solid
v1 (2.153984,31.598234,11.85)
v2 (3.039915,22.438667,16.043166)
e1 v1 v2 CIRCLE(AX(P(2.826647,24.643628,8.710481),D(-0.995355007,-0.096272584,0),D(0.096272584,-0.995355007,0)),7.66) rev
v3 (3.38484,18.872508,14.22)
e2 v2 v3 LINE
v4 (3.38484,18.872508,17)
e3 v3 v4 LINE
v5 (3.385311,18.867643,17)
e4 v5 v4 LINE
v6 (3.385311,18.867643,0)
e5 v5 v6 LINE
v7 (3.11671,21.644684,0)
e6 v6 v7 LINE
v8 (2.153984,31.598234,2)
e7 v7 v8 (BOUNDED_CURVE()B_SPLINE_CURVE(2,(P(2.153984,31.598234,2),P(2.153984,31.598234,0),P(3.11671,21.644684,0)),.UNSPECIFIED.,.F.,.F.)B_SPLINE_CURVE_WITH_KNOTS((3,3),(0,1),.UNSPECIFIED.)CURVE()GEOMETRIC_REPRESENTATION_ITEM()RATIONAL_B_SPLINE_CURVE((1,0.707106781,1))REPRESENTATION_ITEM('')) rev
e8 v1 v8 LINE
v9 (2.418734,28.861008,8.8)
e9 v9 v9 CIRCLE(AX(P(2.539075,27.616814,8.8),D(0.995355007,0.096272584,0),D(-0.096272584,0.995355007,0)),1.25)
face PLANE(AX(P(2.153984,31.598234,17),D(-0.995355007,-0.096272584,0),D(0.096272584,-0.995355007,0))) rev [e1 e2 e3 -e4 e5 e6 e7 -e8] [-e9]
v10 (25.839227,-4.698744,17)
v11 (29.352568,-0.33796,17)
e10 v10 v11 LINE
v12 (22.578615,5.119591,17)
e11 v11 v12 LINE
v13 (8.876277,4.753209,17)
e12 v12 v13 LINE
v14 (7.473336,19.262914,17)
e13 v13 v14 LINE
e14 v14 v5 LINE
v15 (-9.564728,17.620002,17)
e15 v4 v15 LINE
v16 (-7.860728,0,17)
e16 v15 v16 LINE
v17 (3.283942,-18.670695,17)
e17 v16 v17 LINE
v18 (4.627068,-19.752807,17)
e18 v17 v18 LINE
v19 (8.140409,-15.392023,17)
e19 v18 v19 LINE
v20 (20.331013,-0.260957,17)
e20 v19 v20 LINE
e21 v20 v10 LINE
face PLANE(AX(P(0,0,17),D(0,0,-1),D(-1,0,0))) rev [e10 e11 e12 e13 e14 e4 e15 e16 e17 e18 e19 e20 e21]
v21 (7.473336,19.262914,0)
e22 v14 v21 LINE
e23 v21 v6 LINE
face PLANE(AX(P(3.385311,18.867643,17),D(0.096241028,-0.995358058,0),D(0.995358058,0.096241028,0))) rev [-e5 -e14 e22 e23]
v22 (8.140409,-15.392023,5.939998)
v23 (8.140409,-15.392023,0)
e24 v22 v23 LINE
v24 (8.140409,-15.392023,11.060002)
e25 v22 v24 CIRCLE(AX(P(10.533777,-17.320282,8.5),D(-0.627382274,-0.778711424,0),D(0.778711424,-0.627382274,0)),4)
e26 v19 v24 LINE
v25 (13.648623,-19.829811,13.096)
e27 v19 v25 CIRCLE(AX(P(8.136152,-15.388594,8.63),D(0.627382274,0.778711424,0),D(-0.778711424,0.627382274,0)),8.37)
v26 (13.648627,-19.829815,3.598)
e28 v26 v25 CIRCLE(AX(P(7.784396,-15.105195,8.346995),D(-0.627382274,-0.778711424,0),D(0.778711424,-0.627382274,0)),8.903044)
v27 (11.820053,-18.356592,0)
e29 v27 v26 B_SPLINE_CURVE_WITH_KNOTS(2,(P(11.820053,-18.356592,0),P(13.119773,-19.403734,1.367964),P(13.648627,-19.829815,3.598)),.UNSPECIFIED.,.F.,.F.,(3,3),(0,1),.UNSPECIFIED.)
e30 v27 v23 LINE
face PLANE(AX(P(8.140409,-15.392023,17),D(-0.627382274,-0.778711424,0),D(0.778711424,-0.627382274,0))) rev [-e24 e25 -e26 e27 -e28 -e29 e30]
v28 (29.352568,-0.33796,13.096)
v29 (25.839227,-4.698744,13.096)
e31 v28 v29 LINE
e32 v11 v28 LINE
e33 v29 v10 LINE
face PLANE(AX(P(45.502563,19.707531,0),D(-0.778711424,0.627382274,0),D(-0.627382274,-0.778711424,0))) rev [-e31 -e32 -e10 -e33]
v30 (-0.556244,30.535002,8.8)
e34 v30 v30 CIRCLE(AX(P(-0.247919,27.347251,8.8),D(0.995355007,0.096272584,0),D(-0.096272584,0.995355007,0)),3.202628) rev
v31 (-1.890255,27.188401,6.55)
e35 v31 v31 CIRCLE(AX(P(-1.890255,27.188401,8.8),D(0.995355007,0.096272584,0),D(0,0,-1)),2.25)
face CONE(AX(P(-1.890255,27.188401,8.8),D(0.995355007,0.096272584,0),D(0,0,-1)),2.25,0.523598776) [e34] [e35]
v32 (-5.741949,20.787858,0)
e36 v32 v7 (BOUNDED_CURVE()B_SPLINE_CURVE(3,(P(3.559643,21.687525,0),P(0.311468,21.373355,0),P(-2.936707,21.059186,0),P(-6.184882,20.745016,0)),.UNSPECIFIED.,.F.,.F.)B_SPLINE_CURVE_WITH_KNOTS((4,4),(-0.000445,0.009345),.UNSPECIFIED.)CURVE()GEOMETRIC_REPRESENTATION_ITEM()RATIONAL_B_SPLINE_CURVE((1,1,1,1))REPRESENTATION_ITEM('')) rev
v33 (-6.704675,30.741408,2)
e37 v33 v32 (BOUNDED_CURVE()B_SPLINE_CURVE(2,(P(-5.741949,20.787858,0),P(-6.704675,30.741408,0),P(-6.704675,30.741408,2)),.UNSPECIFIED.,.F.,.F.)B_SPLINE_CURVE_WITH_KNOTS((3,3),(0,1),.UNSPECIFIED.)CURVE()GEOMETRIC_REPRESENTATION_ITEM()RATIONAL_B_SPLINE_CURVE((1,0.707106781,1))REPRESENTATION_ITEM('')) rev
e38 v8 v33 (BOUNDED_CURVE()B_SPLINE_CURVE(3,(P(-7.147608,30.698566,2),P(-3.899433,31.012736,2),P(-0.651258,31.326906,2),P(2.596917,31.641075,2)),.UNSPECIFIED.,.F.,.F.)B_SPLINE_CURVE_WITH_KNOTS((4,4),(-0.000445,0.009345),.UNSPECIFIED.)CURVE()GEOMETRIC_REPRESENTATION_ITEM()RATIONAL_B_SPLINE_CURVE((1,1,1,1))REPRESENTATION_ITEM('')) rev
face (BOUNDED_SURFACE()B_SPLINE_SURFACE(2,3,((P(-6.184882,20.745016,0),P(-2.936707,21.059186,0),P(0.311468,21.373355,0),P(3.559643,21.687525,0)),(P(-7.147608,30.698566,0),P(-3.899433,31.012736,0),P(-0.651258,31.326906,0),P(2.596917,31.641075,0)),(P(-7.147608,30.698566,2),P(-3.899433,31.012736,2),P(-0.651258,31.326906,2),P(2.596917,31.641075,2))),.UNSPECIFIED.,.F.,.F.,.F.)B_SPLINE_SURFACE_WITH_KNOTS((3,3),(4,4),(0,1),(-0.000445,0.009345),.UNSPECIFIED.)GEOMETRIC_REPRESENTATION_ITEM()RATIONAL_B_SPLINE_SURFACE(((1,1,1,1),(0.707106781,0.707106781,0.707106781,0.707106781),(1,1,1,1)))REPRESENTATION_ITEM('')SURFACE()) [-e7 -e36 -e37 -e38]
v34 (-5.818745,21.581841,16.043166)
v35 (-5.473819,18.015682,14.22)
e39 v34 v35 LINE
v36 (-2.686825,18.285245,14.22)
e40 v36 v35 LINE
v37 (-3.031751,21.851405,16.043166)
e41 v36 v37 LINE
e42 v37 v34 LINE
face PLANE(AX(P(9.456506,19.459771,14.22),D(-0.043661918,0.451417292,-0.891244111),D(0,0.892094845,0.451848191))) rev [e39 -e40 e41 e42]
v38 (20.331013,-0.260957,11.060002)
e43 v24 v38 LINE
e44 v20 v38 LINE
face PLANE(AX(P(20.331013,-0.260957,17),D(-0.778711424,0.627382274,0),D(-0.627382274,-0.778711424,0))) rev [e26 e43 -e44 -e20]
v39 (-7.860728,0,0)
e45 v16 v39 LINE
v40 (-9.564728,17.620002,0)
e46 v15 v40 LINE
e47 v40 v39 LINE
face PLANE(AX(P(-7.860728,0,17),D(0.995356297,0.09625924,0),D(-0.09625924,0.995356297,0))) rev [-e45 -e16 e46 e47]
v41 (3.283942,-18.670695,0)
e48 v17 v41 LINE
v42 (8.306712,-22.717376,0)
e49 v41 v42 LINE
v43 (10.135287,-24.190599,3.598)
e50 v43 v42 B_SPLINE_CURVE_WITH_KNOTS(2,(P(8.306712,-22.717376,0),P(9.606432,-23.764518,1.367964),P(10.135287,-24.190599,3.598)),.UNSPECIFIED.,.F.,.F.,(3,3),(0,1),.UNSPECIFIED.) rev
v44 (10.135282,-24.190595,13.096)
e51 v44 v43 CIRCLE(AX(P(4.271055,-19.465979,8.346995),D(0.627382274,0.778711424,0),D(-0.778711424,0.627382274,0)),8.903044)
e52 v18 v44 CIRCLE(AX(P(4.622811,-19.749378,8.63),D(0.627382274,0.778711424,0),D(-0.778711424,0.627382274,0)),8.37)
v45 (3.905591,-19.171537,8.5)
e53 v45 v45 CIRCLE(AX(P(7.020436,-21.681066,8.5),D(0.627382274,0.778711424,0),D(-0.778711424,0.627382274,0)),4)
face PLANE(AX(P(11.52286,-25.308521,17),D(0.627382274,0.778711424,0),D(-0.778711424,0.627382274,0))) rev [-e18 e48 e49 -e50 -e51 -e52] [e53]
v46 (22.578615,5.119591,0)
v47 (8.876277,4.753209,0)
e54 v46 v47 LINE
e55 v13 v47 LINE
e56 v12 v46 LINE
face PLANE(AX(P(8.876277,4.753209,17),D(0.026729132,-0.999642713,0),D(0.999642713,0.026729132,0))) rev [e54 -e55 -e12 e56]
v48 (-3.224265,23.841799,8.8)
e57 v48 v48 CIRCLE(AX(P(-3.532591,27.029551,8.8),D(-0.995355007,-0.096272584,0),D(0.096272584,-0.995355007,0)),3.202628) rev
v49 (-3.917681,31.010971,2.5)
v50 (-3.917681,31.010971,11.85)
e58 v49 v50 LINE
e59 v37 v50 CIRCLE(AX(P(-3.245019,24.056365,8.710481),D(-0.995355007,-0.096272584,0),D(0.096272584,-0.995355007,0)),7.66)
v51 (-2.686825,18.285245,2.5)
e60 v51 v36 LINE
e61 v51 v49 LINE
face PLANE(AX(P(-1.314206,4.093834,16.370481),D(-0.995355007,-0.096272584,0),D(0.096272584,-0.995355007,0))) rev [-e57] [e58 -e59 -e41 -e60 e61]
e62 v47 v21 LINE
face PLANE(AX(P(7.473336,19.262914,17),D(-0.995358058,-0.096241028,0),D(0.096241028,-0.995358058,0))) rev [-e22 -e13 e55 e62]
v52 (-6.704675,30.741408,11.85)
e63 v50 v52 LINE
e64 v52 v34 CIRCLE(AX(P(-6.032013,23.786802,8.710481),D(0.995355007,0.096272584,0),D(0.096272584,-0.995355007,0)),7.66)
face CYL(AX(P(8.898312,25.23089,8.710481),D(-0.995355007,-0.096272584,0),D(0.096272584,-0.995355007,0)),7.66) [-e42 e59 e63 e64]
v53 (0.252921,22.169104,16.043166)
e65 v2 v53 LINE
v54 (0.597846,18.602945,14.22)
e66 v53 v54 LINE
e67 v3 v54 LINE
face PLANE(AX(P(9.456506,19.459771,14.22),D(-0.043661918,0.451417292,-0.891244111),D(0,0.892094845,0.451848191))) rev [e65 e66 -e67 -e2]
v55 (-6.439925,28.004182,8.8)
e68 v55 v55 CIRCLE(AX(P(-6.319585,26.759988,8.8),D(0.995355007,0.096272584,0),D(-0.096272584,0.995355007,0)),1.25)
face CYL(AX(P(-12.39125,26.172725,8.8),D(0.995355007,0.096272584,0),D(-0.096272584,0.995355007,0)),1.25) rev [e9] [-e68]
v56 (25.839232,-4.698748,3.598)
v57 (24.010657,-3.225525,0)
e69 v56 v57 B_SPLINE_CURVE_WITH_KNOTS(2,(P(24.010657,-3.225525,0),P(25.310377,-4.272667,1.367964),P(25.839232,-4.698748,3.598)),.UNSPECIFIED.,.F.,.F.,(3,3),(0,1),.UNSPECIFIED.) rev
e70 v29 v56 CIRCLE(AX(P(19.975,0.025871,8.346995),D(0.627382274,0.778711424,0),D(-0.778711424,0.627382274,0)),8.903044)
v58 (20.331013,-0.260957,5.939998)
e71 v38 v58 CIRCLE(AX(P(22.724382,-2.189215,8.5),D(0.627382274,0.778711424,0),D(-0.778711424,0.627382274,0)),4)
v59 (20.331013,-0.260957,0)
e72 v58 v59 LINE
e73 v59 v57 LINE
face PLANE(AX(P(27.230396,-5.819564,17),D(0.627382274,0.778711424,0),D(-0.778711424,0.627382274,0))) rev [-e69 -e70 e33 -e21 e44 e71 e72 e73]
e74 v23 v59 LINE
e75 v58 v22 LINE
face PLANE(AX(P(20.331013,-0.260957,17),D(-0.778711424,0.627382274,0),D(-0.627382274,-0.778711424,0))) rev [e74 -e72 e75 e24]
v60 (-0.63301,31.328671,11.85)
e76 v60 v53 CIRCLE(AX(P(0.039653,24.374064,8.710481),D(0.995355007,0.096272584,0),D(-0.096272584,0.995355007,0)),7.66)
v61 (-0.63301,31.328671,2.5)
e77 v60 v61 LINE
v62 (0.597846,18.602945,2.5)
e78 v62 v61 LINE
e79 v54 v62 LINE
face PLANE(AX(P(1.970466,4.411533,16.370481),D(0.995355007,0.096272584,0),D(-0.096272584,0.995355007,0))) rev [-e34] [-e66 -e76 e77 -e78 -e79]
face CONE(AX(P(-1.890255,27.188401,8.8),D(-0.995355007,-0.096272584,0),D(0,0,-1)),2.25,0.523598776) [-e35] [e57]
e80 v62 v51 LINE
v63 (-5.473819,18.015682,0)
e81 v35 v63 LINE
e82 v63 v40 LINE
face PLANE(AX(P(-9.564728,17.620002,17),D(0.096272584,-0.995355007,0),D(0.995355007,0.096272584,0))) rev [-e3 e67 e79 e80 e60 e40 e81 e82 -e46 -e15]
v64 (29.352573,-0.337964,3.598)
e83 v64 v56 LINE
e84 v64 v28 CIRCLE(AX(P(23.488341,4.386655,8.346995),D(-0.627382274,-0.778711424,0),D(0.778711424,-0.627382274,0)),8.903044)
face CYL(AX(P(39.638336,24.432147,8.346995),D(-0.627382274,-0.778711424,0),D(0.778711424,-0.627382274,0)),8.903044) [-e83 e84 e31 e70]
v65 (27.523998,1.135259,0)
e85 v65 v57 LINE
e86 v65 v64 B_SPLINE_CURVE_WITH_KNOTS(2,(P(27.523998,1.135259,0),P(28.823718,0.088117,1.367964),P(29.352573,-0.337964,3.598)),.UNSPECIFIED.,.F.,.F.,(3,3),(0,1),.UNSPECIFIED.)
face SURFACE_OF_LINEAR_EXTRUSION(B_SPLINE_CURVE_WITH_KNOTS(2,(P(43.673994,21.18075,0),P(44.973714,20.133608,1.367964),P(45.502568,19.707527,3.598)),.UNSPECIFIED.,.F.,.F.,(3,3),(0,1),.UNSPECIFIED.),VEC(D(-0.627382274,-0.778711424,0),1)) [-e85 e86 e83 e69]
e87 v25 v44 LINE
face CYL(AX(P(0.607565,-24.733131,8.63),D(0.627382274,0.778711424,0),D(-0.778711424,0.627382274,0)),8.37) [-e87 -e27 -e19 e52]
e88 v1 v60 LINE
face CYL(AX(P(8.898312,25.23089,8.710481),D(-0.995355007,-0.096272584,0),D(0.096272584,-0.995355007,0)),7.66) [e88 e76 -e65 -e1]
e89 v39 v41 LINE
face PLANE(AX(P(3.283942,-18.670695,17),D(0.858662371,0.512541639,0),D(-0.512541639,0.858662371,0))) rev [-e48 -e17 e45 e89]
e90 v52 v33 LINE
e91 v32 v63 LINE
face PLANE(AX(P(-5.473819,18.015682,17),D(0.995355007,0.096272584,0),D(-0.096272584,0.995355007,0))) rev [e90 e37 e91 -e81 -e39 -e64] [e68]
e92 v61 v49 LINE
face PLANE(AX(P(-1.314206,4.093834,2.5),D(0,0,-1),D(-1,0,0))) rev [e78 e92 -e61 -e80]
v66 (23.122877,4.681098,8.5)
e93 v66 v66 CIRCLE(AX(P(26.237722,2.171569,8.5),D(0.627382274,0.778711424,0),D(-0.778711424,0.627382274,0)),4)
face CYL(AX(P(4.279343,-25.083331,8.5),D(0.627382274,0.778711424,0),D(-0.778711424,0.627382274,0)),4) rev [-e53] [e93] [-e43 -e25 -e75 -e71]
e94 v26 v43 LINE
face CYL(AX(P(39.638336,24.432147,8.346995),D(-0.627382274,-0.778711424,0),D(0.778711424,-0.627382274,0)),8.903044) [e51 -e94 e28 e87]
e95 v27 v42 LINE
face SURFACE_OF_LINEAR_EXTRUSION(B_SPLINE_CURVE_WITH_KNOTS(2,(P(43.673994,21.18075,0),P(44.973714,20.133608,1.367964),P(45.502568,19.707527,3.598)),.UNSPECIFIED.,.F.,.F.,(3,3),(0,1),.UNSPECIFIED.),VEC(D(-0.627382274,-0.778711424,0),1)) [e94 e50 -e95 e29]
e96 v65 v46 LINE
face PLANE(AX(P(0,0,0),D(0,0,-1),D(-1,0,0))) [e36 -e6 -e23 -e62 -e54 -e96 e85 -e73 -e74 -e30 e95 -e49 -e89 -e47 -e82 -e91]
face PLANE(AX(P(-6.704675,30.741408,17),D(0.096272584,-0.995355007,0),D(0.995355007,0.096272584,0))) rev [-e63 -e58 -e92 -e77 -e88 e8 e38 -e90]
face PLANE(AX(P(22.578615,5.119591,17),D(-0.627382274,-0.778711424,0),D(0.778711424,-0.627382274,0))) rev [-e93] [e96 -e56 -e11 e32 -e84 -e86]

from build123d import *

# Parameters (mm, degrees)
BOSS_EXTRUDE1_DEPTH     = 17
CUT_EXTRUDE1_DEPTH      = 15
CUT_EXTRUDE2_DEPTH      = 46.197309304
CUT_EXTRUDE2_DEPTH_BACK = 46.197309304
CUT_EXTRUDE3_DEPTH      = 12
SKETCH6_R               = 4
CUT_EXTRUDE4_DEPTH      = 35
CUT_EXTRUDE5_START      = -12.78511231
CUT_EXTRUDE5_OUTLINE_W  = 3.3
CUT_EXTRUDE5_OUTLINE_H  = 13.870481222
CUT_EXTRUDE5_DEPTH      = 12.78511231
SKETCH8_R               = 1.25
CUT_EXTRUDE6_DEPTH      = 15
SKETCH10_R              = 1.25
CUT_EXTRUDE7_DEPTH      = 15
FILLET1_SIZE            = 2
FILLET1_SIZE_2          = 10


# Read off the part's stored shape, not the designer's step: Cut-Extrude5, Extrude-Thin1
with BuildPart() as part:
    # Sketch1 → Boss-Extrude1 (new body)
    with BuildSketch(Plane.XY):
        Polygon((-9.564728379, 17.62000192), (-5.473819301, 18.015682238), (-6.704675095, 30.741407789), (2.153984466, 31.598233783), (3.38531081, 18.867643246), (7.473335954, 19.262913811), (8.876277245, 4.753208867), (22.578615379, 5.119591375), (30.743737203, -1.458779689), (27.230396467, -5.819563663), (20.33101325, -0.260956714), (8.140408694, -15.392023407), (15.036201119, -20.947737373), (11.522860383, -25.308521347), (3.283942394, -18.670695131), (-7.860727511, 0), align=None)
    extrude(amount=BOSS_EXTRUDE1_DEPTH)

    # Sketch3 → Cut-Extrude1 (cut)
    with BuildSketch(Plane(origin=(-3.696725775, -0.357554178, 0), x_dir=(0, 0, 1), z_dir=(-0.9953550068413657, -0.09627258361457379, 0))):
        with BuildLine():
            Line((0, 31.244090554), (0, 32.721435634))
            Line((0, 32.721435634), (17.68, 32.721435634))
            Line((17.68, 32.721435634), (17.68, 18.458978244))
            Line((17.68, 18.458978244), (14.22, 18.458978244))
            Line((14.22, 18.458978244), (16.043166109, 22.04177957))
            ThreePointArc((16.043166109, 22.04177957), (15.680947079, 27.433223117), (11.85, 31.244090554))
            Line((11.85, 31.244090554), (0, 31.244090554))
        make_face()
    extrude(amount=-CUT_EXTRUDE1_DEPTH, mode=Mode.SUBTRACT)

    # Sketch4 → Cut-Extrude2 (cut, two sides: drawn at the far end of the back side and taken through both)
    with BuildSketch(Plane(origin=(7.87496966, 9.774469394, 0), x_dir=(0.7787114240648987, -0.6273822742402098, 0), z_dir=(-0.6273822742402096, -0.7787114240648986, 0)).offset(-CUT_EXTRUDE2_DEPTH_BACK)):
        Polygon((15.990906633, 19.904885529), (15.990906633, 16.999999998), (15.995711897, 16.999999998), (23.069210216, 16.999999998), (24.855711897, 17), (24.855711897, 0), (20.721010741, 0), (15.995711897, -2e-09), (15.990906633, -2e-09), (15.990906633, -2.308790515), (29.141254547, -2.308790515), (29.141254547, 19.904885529), align=None)
        with BuildLine():
            Line((24.855711897, 17), (23.069210216, 17))
            Line((23.069210216, 16.999999998), (23.069210216, 13.096000073))
            ThreePointArc((23.069210216, 13.096000073), (24.441573822, 8.347001118), (23.069216362, 3.598000386))
            add(Edge.make_bspline(
                [(20.721010741, -2e-09), (22.390075827, 1.367964254), (23.069216362, 3.598000386)],
                knots=[0, 0, 0, 1, 1, 1], degree=2))
            Line((20.721010741, 0), (24.855711897, 0))
            Line((24.855711897, 0), (24.855711897, 17))
        make_face()
    extrude(amount=CUT_EXTRUDE2_DEPTH + CUT_EXTRUDE2_DEPTH_BACK, mode=Mode.SUBTRACT)

    # Sketch5 → Cut-Extrude3 (cut)
    with BuildSketch(Plane(origin=(-4.315634896, -5.356597299, 0), x_dir=(0.7787114240649037, -0.6273822742402033, 0), z_dir=(0.6273822742402033, 0.7787114240649037, 0))):
        with BuildLine():
            Line((15.990245326, -16.999999999), (23.069210216, -16.999999999))
            Line((23.069210216, -16.999999999), (23.069210216, -13.096000073))
            ThreePointArc((23.069210216, -13.096000073), (20.032304179, -15.959301473), (15.990245326, -16.999999999))
        make_face()
    extrude(amount=-CUT_EXTRUDE3_DEPTH, mode=Mode.SUBTRACT)

    # Sketch6 → Cut-Extrude4 (cut)
    with BuildSketch(Plane(origin=(11.388310395, 14.135253369, 0), x_dir=(0.7787114240649039, -0.6273822742402033, 0), z_dir=(0.6273822742402032, 0.7787114240649039, 0))):
        with Locations(Location((19.069210216, -8.499999999, 0), (0, 0, 180))):
            Circle(SKETCH6_R)
    extrude(amount=-CUT_EXTRUDE4_DEPTH, mode=Mode.SUBTRACT)

    # Cut-Extrude5 outline → Cut-Extrude5 (cut)
    with BuildSketch(Plane(origin=(-3.00794932, 31.098961967, 0), x_dir=(0.995355006841366, 0.0962725836145697, 0), z_dir=(-0.0962725836145697, 0.995355006841366, 0)).offset(CUT_EXTRUDE5_START)):
        with Locations((0.736022827, -9.435240611)):
            Rectangle(CUT_EXTRUDE5_OUTLINE_W, CUT_EXTRUDE5_OUTLINE_H)
    extrude(amount=CUT_EXTRUDE5_DEPTH, mode=Mode.SUBTRACT)

    # Sketch8 → Cut-Extrude6 (cut)
    with BuildSketch(Plane(origin=(5.161933786, 0.499271816, 0), x_dir=(0, 0, -1), z_dir=(0.9953550068413664, 0.09627258361456668, 0))):
        with Locations(Location((-8.8, 27.244090554, 0), (0, 0, 90))):
            Circle(SKETCH8_R)
    extrude(amount=-CUT_EXTRUDE6_DEPTH, mode=Mode.SUBTRACT)

    # Extrude-Thin1 outline → Extrude-Thin1 (revolve)
    with BuildSketch(Plane(origin=(-2.622858986, 27.11754194, 8.8), x_dir=(-0.0962725836145697, 0.9953550068413659, 0), z_dir=(0, 0, -1))):
        Polygon((1.25, 0.736022827), (0.297372056, -0.913977173), (3.202627944, -0.913977173), (2.25, 0.736022827), (3.202627944, 2.386022827), (0.297372056, 2.386022827), align=None)
    revolve(axis=Axis((-2.622858986, 27.11754194, 8.8), (0.9953550068413659, 0.0962725836145697, 0)))

    # Sketch10 → Cut-Extrude7 (cut)
    with BuildSketch(Plane(origin=(5.161933786, 0.499271816, 0), x_dir=(0, 0, -1), z_dir=(0.9953550068413664, 0.09627258361456668, 0))):
        with Locations(Location((-8.8, 27.244090554, 0), (0, 0, 90))):
            Circle(SKETCH10_R)
    extrude(amount=-CUT_EXTRUDE7_DEPTH, mode=Mode.SUBTRACT)

    # Fillet1
    # an asymmetric fillet: 10, 2 mm, written as the material it takes off along each edge
    with BuildSketch(Plane(origin=(-31.588550266, 28.334593199, 0), x_dir=(0, 0, 1), z_dir=(0.995355006841366, 0.0962725836145696, 0))) as fillet1_piece_1:
        with BuildLine():
            Bezier((FILLET1_SIZE, 0), (0, 0), (0, FILLET1_SIZE_2), weights=[1, 0.707106781, 1])
            Line((0, FILLET1_SIZE_2), (0, 0))
            Line((0, 0), (FILLET1_SIZE, 0))
        make_face()
    extrude(amount=58.9, mode=Mode.SUBTRACT)


solid = part.part
